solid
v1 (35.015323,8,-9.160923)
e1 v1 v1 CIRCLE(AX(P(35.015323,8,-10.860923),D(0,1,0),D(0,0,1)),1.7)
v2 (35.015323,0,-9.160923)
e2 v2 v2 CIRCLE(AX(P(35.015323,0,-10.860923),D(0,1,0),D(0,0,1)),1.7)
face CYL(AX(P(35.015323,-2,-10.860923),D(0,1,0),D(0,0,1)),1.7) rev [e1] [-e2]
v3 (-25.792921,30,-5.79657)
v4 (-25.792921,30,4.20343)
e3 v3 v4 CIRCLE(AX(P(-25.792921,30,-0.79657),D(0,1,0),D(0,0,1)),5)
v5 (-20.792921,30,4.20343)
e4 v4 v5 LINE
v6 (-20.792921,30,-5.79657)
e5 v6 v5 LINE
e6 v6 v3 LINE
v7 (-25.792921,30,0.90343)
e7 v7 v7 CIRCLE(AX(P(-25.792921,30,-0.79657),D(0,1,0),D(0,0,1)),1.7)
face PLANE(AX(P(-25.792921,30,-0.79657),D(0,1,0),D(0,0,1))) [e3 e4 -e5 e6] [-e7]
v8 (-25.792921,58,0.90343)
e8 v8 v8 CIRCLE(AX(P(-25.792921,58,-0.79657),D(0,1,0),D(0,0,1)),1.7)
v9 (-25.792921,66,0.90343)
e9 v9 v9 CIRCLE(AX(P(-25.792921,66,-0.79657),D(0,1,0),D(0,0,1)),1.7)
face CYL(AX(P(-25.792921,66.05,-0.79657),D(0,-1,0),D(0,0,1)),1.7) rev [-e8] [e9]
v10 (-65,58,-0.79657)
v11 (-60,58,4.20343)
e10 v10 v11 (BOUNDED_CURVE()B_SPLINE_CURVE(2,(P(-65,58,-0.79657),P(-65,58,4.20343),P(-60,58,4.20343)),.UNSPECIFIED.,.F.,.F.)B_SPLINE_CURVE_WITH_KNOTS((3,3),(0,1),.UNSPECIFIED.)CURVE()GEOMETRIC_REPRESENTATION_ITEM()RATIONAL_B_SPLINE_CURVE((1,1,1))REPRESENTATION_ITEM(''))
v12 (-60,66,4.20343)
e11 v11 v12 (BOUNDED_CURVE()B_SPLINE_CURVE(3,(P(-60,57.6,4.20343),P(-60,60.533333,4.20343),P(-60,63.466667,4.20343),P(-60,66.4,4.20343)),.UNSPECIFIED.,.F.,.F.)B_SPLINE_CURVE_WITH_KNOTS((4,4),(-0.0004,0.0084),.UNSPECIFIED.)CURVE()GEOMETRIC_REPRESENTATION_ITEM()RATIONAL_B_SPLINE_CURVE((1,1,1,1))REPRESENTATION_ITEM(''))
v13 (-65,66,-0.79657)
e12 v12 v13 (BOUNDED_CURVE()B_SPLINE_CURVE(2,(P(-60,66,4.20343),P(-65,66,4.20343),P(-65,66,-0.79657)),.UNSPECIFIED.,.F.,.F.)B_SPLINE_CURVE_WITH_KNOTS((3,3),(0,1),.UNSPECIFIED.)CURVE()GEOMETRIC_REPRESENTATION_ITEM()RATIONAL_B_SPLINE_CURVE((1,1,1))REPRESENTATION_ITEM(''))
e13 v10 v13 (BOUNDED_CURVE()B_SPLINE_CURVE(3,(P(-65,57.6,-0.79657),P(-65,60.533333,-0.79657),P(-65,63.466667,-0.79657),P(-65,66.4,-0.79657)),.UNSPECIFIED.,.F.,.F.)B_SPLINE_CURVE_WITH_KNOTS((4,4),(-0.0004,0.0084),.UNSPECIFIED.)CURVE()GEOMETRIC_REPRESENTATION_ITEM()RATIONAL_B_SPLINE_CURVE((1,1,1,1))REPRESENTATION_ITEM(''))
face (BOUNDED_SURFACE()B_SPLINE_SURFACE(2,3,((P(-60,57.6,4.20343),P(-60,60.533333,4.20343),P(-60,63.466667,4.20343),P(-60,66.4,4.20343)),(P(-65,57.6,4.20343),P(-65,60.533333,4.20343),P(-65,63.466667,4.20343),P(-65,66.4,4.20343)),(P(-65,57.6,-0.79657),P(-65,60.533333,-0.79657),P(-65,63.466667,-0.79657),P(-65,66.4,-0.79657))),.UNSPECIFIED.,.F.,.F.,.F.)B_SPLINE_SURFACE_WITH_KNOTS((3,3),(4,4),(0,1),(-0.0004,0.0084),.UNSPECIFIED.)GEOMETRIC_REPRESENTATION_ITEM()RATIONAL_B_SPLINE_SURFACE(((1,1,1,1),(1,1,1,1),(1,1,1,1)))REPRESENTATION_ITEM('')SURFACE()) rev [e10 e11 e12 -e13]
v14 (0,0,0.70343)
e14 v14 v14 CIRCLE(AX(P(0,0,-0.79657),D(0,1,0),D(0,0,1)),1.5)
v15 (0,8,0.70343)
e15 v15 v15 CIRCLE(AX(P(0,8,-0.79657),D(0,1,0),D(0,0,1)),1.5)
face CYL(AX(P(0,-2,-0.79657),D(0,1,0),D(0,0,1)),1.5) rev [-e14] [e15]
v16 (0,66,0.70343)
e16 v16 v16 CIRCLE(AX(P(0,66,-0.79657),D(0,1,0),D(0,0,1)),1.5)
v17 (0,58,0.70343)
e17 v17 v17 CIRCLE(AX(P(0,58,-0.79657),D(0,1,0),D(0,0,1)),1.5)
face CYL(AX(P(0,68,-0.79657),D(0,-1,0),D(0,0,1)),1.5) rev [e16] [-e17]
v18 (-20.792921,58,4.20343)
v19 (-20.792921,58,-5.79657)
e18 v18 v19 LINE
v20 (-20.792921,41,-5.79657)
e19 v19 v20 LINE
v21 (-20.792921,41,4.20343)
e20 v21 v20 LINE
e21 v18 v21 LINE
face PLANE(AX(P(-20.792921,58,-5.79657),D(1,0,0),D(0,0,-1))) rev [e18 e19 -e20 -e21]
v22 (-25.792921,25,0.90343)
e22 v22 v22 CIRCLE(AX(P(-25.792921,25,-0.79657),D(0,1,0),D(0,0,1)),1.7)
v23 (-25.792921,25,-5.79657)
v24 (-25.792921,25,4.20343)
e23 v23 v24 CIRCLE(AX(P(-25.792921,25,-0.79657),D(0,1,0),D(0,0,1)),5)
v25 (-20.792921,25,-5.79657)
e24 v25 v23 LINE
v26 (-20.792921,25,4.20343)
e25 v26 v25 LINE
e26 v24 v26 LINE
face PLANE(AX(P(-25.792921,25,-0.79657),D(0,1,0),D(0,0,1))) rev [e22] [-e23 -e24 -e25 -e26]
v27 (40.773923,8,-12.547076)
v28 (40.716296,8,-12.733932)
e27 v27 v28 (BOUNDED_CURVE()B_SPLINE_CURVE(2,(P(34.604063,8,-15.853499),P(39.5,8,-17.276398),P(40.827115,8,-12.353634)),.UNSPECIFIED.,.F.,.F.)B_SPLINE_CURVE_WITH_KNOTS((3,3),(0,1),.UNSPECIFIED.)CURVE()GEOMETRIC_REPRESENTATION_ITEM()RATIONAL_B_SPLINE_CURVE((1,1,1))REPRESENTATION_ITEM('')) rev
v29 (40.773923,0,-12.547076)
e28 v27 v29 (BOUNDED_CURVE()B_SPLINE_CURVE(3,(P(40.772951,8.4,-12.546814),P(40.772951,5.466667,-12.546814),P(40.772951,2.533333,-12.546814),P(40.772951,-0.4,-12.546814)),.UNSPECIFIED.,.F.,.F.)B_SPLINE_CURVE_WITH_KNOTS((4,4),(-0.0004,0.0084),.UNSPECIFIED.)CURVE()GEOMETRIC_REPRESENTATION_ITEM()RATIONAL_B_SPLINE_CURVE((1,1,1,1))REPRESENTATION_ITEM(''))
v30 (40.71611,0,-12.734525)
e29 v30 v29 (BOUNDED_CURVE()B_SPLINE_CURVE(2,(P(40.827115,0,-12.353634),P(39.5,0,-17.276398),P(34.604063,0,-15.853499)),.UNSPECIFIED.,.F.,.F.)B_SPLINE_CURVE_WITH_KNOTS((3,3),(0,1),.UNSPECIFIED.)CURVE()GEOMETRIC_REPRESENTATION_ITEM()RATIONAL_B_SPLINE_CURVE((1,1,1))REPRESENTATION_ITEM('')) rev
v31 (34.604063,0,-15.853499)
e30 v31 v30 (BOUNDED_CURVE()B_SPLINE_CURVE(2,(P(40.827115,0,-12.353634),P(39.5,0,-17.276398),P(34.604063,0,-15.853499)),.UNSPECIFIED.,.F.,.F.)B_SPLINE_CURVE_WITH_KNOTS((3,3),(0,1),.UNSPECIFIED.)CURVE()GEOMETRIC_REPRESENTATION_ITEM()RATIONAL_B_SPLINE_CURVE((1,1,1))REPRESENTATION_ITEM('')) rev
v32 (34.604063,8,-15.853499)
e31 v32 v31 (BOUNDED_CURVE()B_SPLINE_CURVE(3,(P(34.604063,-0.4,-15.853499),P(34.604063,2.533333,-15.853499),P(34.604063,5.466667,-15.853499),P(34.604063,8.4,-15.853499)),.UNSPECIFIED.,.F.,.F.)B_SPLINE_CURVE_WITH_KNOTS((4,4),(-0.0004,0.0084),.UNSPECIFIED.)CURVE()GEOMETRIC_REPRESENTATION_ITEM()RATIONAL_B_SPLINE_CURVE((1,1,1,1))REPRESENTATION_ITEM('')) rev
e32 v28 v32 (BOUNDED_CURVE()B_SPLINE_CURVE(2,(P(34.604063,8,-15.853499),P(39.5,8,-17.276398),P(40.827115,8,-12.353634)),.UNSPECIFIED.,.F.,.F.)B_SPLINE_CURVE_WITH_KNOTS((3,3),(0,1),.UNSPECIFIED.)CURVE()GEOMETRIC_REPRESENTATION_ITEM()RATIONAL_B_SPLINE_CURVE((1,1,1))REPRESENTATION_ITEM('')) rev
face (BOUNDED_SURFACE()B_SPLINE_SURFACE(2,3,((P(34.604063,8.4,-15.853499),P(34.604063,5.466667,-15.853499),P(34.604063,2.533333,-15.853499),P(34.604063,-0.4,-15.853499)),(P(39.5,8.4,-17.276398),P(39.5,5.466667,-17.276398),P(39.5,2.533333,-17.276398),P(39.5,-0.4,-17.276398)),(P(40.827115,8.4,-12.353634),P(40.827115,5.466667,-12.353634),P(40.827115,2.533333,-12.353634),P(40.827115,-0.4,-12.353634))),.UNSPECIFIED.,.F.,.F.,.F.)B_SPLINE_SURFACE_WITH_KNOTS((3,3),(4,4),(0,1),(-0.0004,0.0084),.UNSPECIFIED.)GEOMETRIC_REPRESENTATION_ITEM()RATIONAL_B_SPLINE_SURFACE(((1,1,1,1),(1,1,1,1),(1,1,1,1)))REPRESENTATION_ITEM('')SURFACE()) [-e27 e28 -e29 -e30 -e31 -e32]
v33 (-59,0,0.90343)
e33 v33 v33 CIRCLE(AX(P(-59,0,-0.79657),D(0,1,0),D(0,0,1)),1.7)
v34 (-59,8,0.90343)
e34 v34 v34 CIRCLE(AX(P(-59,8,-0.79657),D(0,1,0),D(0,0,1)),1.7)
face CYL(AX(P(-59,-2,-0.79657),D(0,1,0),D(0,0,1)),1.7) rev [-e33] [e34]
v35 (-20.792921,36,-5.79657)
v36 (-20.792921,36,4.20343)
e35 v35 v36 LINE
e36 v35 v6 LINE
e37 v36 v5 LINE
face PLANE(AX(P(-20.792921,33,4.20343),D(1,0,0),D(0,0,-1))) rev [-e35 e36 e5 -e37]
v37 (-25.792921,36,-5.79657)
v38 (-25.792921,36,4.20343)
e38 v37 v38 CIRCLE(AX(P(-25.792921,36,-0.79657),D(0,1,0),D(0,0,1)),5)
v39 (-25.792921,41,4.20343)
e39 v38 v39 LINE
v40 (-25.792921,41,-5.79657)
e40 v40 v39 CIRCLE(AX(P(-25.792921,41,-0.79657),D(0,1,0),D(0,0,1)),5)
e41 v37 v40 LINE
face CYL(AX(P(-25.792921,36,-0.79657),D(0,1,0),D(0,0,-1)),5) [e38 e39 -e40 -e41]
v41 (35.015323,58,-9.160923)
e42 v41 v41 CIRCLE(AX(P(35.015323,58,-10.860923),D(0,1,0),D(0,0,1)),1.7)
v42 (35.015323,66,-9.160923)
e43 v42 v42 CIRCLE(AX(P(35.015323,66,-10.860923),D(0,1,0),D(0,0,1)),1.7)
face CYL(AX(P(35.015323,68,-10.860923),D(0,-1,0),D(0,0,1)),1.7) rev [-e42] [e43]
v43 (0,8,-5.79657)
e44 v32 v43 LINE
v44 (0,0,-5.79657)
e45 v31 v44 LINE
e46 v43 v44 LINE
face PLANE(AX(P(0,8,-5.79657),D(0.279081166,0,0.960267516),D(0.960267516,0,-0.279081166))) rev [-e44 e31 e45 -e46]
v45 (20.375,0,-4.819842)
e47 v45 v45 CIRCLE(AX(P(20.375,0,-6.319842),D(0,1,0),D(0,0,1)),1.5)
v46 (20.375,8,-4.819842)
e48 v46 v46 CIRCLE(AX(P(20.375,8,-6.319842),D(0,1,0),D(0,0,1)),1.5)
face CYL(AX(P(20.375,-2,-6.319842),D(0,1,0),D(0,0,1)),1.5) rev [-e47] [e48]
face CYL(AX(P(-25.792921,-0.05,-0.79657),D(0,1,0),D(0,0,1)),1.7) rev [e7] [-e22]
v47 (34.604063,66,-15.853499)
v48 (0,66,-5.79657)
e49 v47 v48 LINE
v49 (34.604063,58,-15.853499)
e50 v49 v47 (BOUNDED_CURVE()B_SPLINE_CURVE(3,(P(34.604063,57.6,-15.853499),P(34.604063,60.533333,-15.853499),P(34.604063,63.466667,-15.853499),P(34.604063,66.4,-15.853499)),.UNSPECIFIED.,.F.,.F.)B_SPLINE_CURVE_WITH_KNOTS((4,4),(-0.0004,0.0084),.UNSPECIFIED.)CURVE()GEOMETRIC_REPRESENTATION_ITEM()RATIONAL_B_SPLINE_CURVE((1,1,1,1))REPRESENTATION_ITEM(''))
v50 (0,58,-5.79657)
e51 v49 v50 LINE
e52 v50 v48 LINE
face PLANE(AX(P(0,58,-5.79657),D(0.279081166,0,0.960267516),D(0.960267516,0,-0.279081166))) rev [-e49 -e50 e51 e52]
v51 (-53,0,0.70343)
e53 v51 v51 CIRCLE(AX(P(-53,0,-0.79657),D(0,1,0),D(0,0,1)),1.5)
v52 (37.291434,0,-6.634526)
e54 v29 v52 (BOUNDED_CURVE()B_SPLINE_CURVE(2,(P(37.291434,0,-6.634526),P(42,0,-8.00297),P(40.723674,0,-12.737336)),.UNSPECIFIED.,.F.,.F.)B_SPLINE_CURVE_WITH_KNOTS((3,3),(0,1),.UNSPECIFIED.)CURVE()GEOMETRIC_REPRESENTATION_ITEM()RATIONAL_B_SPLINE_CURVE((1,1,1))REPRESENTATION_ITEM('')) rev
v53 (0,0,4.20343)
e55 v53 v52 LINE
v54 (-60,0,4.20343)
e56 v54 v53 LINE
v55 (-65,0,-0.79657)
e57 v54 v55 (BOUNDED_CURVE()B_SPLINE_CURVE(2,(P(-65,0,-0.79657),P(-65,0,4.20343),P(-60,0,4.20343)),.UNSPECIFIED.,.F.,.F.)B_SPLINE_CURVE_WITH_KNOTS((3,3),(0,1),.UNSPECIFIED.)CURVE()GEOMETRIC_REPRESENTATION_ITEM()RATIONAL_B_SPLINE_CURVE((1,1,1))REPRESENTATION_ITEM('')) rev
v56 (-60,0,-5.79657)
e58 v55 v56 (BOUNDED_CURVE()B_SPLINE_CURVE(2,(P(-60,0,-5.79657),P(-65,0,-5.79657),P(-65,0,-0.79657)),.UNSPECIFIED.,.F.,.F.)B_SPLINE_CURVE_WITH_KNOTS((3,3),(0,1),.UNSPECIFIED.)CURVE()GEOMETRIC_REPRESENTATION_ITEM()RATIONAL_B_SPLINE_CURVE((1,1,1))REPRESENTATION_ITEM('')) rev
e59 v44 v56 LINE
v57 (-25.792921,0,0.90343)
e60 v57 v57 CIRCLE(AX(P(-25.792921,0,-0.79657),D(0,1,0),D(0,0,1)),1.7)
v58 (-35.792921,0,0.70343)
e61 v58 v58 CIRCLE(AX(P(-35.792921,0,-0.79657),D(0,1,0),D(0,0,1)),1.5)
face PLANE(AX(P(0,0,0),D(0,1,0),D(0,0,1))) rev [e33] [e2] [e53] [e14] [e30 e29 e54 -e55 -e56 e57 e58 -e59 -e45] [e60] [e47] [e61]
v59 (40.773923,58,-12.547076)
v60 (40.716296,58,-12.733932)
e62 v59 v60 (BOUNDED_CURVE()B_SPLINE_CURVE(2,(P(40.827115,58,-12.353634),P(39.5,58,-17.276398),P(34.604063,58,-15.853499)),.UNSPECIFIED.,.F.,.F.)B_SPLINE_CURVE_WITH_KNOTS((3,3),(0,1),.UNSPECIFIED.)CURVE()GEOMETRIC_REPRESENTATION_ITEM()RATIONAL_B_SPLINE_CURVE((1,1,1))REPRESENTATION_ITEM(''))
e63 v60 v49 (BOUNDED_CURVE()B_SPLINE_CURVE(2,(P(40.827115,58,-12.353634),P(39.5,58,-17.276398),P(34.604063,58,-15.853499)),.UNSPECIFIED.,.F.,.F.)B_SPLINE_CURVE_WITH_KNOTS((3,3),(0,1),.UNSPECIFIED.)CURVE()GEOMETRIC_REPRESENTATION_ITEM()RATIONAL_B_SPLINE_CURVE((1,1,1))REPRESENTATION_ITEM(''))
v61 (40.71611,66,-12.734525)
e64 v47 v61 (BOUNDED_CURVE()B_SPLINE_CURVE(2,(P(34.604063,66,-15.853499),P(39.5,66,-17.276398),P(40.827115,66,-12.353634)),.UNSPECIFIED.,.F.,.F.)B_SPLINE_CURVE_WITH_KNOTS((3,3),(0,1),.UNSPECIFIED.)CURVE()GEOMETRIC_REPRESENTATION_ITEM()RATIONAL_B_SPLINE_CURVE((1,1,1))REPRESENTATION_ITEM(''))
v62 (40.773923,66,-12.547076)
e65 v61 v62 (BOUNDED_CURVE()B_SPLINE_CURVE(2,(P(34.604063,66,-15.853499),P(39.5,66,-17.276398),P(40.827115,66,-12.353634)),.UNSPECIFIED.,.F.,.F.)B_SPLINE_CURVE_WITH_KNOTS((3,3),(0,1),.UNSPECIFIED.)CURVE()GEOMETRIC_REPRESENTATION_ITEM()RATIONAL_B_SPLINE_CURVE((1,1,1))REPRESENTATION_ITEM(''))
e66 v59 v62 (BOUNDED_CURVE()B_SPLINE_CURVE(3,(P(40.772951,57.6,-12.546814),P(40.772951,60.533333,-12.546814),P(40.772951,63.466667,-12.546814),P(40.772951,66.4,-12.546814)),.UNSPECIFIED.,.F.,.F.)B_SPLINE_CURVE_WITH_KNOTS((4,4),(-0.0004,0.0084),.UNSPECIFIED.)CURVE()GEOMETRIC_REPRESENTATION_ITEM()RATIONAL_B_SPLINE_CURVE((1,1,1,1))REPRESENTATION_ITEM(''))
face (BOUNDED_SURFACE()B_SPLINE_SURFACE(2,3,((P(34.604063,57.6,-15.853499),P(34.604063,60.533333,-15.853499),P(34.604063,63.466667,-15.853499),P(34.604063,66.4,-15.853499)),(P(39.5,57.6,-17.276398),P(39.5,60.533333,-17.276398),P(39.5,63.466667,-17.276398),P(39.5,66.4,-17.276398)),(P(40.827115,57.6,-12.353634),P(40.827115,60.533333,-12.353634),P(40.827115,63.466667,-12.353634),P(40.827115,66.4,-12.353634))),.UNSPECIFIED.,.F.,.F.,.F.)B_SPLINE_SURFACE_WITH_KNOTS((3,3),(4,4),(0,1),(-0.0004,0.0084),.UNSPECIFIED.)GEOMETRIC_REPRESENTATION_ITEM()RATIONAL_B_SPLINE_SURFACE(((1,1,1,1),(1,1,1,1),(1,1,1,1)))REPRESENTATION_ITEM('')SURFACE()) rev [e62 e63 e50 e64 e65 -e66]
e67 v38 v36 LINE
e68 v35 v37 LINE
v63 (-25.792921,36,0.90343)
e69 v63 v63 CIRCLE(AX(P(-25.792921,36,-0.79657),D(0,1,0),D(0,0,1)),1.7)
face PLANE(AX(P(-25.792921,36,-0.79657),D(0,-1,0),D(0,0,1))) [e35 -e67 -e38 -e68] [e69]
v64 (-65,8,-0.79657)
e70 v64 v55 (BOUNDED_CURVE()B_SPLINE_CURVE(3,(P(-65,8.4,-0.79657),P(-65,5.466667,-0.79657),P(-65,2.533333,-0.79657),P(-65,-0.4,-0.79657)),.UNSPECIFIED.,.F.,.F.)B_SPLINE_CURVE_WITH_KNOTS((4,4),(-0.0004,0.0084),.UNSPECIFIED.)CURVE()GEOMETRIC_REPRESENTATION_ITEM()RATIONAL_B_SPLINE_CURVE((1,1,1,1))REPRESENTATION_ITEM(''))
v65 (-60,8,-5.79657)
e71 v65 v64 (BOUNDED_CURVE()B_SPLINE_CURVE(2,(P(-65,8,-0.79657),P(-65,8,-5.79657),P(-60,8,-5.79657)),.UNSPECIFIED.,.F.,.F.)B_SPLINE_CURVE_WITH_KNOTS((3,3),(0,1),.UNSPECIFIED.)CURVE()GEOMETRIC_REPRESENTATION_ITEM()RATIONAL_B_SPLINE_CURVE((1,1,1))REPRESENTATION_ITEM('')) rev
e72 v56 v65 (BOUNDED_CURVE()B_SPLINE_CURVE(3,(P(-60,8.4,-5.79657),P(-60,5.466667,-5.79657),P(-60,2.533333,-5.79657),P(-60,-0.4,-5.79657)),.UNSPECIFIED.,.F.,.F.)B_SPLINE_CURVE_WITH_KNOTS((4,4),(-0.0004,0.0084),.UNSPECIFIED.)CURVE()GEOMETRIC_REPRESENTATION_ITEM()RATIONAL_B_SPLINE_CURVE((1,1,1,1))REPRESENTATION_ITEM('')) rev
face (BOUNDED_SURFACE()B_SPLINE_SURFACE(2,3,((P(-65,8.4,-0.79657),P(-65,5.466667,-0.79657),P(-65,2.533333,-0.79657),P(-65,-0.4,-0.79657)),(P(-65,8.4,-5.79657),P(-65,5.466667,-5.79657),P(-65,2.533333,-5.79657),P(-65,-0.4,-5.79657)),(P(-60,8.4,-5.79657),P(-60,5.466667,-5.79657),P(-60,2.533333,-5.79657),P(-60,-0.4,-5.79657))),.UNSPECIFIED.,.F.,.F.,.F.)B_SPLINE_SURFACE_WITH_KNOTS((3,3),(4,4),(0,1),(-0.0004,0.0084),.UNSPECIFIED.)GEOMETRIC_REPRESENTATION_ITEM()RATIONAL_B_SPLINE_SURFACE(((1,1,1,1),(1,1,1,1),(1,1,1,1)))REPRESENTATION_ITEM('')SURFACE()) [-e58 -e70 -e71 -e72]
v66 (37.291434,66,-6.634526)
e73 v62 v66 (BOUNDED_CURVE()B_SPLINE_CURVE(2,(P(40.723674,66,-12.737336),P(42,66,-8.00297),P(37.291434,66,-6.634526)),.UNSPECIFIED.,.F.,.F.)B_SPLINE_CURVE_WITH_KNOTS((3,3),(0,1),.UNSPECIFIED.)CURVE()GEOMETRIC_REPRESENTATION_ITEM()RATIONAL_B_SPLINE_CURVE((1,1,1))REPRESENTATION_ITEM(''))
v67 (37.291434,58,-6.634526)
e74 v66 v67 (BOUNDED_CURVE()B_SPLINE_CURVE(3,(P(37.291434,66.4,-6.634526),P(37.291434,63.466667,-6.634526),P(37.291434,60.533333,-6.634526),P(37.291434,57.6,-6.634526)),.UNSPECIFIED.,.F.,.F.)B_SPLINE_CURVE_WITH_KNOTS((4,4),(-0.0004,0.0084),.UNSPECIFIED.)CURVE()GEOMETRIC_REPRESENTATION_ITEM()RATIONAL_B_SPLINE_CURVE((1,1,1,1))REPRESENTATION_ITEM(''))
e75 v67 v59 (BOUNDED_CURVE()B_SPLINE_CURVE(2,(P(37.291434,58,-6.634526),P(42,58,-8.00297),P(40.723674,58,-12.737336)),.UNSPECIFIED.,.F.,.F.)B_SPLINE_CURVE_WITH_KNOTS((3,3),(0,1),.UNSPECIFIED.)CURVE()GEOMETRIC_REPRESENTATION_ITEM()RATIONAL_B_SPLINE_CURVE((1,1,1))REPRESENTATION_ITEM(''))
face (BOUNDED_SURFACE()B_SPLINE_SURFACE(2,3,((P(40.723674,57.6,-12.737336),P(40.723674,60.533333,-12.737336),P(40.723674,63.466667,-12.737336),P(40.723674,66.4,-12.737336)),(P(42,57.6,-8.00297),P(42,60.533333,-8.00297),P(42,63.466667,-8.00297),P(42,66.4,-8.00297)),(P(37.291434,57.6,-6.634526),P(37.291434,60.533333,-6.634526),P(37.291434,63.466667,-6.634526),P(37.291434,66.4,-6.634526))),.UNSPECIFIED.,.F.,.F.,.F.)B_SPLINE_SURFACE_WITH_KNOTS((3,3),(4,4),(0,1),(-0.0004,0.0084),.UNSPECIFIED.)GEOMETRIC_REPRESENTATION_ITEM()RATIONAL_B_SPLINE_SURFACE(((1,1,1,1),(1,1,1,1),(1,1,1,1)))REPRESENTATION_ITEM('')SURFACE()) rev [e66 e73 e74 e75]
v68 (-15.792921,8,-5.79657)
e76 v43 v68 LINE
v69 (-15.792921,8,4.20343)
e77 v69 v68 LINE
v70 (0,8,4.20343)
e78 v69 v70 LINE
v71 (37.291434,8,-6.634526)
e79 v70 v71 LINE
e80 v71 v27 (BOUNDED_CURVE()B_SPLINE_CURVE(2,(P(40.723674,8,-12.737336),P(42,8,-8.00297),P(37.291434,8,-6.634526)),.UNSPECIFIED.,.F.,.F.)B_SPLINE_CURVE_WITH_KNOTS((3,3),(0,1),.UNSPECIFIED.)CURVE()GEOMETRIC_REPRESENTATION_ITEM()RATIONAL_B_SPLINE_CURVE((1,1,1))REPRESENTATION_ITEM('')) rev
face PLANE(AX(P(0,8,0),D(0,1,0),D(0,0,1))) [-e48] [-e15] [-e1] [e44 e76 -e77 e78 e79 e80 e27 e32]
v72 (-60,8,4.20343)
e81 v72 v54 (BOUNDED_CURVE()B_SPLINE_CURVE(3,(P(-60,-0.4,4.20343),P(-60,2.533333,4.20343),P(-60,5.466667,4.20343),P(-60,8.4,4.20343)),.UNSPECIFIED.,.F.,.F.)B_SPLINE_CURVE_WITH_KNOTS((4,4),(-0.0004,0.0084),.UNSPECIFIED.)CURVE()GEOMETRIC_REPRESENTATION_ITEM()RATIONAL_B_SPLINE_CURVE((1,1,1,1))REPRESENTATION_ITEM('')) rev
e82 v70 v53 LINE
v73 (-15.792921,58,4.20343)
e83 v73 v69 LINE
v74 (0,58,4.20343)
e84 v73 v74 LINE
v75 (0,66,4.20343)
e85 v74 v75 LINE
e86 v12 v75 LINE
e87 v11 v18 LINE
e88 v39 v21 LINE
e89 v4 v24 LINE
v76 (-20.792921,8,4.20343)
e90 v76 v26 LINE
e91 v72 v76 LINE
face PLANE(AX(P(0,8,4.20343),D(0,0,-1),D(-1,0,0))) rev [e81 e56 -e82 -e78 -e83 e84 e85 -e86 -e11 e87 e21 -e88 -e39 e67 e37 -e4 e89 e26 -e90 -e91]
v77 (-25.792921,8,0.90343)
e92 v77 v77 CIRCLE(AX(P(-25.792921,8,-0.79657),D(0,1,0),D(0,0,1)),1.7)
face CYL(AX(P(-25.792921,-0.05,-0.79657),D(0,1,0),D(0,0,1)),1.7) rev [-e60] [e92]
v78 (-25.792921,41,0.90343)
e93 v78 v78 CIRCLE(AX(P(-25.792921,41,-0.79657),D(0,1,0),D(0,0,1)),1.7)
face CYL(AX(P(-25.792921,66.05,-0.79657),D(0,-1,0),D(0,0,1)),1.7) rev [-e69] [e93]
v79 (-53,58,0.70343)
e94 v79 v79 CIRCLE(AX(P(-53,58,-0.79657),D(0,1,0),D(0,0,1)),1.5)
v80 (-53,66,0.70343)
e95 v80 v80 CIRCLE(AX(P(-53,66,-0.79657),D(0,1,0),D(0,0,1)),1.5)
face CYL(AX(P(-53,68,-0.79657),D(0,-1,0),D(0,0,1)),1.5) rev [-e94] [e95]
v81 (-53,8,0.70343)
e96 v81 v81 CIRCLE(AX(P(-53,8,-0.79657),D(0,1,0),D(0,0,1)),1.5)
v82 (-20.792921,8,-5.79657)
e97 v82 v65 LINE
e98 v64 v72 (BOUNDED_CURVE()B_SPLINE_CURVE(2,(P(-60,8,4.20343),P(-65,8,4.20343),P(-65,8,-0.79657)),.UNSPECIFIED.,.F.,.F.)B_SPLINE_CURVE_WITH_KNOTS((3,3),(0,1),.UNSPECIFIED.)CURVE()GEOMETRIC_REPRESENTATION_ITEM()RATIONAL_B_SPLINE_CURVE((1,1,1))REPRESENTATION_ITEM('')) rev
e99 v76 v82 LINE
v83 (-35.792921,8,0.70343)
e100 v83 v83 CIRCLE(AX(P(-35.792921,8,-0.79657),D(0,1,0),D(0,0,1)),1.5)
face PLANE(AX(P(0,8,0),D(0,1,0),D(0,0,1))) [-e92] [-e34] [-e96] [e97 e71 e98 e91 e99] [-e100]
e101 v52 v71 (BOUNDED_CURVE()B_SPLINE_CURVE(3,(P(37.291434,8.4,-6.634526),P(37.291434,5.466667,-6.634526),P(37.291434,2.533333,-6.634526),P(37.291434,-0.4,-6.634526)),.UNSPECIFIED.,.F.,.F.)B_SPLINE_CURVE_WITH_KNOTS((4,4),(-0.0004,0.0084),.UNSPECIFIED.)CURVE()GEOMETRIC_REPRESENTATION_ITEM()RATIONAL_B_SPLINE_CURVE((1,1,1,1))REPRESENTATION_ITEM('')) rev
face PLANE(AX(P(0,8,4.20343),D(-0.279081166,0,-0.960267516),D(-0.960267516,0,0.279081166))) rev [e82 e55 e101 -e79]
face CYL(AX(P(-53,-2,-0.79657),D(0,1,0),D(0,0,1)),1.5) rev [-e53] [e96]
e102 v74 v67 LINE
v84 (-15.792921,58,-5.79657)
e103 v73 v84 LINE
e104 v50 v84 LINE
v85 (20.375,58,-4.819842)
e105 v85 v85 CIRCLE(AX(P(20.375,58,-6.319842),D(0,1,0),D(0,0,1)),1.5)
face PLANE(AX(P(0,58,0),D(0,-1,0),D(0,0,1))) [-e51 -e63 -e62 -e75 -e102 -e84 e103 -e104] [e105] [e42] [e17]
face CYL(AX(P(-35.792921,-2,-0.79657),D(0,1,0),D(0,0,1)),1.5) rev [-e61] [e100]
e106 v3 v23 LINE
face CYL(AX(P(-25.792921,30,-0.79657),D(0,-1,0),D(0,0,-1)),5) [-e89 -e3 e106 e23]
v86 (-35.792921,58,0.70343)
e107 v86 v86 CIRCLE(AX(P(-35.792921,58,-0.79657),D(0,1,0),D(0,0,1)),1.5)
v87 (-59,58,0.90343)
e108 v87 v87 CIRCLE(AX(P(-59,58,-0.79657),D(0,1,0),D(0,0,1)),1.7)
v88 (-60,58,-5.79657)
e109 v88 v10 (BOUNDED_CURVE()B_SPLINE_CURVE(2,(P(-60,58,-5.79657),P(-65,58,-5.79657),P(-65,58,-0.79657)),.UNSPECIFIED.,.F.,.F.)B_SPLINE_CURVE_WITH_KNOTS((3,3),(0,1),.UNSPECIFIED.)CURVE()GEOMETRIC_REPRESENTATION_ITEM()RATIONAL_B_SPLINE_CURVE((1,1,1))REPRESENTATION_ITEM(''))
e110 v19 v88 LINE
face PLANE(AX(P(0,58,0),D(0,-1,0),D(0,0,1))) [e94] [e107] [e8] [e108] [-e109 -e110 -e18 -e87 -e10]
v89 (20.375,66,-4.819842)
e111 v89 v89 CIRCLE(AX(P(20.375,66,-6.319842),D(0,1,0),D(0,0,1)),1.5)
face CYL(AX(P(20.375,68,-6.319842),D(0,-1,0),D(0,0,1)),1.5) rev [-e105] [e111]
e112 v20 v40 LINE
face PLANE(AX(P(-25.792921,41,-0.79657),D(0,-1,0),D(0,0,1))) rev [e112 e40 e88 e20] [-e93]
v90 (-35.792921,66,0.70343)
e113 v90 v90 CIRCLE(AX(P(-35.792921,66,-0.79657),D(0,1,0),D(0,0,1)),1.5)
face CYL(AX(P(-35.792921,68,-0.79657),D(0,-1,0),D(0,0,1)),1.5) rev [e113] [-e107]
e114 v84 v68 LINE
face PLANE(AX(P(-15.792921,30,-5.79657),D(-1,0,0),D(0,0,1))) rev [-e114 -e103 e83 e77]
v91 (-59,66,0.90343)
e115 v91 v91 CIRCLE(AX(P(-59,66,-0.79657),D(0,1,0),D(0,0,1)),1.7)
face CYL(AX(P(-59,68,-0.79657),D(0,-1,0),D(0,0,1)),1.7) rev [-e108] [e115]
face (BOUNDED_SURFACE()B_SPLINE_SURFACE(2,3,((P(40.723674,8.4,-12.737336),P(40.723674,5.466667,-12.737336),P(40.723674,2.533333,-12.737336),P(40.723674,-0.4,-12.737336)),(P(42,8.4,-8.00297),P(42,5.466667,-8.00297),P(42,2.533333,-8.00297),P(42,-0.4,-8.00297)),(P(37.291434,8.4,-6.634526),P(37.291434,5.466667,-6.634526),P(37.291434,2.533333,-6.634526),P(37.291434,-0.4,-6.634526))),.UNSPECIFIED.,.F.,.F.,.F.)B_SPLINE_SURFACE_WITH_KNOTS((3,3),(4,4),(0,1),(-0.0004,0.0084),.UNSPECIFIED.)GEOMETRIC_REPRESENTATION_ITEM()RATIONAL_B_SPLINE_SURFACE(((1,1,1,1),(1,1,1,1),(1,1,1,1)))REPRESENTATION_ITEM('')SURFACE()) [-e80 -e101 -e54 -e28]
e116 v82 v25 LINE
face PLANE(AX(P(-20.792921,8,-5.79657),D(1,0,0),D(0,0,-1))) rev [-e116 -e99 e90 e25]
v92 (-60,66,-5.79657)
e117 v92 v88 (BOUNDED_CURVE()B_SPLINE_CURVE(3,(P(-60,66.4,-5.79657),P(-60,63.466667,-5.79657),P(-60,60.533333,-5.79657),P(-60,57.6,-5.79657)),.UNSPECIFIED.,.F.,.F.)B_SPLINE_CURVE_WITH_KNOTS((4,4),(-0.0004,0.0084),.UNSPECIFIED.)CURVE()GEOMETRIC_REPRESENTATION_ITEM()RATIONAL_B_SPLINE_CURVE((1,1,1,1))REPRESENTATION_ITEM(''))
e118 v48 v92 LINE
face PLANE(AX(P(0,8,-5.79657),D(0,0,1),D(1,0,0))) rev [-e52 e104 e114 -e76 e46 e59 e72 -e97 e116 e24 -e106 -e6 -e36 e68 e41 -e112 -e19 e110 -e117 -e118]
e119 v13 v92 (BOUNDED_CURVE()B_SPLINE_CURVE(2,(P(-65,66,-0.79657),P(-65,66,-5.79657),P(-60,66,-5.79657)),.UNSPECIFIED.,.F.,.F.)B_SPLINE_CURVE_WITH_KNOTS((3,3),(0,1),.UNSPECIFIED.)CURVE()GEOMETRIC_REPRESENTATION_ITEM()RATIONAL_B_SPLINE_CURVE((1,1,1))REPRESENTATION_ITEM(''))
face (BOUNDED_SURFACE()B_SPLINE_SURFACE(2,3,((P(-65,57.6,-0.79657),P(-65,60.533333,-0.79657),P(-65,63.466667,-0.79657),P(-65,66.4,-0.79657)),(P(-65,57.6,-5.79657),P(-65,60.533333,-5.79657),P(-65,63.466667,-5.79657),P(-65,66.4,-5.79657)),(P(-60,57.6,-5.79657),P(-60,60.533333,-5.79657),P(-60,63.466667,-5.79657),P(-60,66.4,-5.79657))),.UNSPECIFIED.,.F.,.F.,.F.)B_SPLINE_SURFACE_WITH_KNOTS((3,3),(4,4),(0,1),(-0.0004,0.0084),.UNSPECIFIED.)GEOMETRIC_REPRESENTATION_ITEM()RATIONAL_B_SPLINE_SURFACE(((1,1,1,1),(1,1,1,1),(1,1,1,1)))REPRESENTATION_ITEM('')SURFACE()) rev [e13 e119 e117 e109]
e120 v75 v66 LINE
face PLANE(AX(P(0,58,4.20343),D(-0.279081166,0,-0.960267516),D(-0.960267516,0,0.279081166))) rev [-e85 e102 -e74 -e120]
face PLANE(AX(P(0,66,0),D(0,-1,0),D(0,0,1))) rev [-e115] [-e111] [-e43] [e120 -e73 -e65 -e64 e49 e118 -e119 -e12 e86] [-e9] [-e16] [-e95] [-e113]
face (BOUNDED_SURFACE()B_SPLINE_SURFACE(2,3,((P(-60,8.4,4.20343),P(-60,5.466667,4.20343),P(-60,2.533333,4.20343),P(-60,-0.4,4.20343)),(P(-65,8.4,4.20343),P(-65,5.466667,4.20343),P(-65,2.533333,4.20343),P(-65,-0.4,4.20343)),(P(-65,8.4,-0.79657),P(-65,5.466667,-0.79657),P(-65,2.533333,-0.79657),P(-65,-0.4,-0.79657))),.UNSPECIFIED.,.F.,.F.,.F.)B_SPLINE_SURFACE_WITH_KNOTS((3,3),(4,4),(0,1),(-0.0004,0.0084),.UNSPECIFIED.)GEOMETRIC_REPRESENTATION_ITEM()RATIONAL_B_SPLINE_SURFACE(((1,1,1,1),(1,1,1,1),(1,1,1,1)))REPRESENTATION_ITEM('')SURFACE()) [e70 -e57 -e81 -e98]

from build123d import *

# Parameters (mm, degrees)
BOSS_EXTRUDE1_DEPTH = 8
SKETCH2_R           = 1.7
SKETCH2_R_2         = 1.5
CUT_EXTRUDE1_DEPTH  = 10
FILLET1_SIZE        = 5
SKETCH3_R           = 5
BOSS_EXTRUDE2_DEPTH = 22
SKETCH4_R           = 1.7
CUT_EXTRUDE2_DEPTH  = 74.393131138
BOSS_EXTRUDE4_DEPTH = 22
SKETCH9_R           = 1.7
CUT_EXTRUDE3_DEPTH  = 17
SKETCH10_W          = 5
SKETCH10_H          = 10
BOSS_EXTRUDE5_DEPTH = 3


with BuildPart() as part:
    # Sketch1 → Boss-Extrude1 (new body)
    with BuildSketch(Plane(origin=(0, 0, 0), x_dir=(1, 0, 0), z_dir=(0, 1, 0))):
        Polygon((0, 5.796570021), (-65, 5.796570021), (-65, -4.203429979), (0, -4.203429979), (42, 8.002969552), (39.5, 17.276398151), align=None)
    extrude(amount=BOSS_EXTRUDE1_DEPTH)

    # Sketch2 → Cut-Extrude1 (cut)
    with BuildSketch(Plane(origin=(0, 8, 0), x_dir=(1, 0, 0), z_dir=(0, 1, 0))):
        with Locations(Location((-59, 0.796570021, 0), (0, 0, 270))):
            Circle(SKETCH2_R)
        with Locations(Location((-53, 0.796570021, 0), (0, 0, 270))):
            Circle(SKETCH2_R_2)
        with Locations(Location((-35.792921067, 0.796570021, 0), (0, 0, 270))):
            Circle(SKETCH2_R_2)
        with Locations(Location((20.375, 6.319841926, 0), (0, 0, 270))):
            Circle(SKETCH2_R_2)
        with Locations(Location((35.015323176, 10.860923065, 0), (0, 0, 270))):
            Circle(SKETCH2_R)
        with Locations(Location((0, 0.796570021, 0), (0, 0, 270))):
            Circle(SKETCH2_R_2)
    extrude(amount=-CUT_EXTRUDE1_DEPTH, mode=Mode.SUBTRACT)

    # Fillet1
    # a fillet whose section is not a circle: 5 mm, written as the material it takes off along each edge
    with BuildSketch(Plane(origin=(-65, -12.5, 4.203429979), x_dir=(0, 0, -1), z_dir=(0, 1, 0)), Plane(origin=(-65, -12.5, -5.796570021), x_dir=(1, 0, 0), z_dir=(0, 1, 0))) as fillet1_piece_1:
        with BuildLine():
            Bezier((FILLET1_SIZE, 0), (0, 0), (0, -FILLET1_SIZE), weights=[1, 1, 1])
            Line((0, -FILLET1_SIZE), (0, 0))
            Line((0, 0), (FILLET1_SIZE, 0))
        make_face()
    extrude(amount=33, mode=Mode.SUBTRACT)

    # Fillet2
    # a fillet whose section is not a circle: 5 mm, written as the material it takes off along each edge
    with BuildSketch(Plane(origin=(39.5, -12.746283343, -17.276398151), x_dir=(-0.9602675163397548, 0, 0.27908116572545455), z_dir=(0, 1, 0))) as fillet2_piece_1:
        with BuildLine():
            Bezier((5.098513337, 0), (0, 0), (0.099464892, 5.097543034), weights=[1, 1, 1])
            Line((0.099464892, 5.097543034), (0, 0))
            Line((0, 0), (5.098513337, 0))
        make_face()
    extrude(amount=33.492566686, mode=Mode.SUBTRACT)
    with BuildSketch(Plane(origin=(42, -12.258475337, -8.002969552), x_dir=(-0.2602945720874772, 0, -0.9655292516241013), z_dir=(0, 1, 0))) as fillet2_piece_2:
        with BuildLine():
            Bezier((4.903390135, 0), (0, 0), (-0.09565831, 4.902456966), weights=[1, 1, 1])
            Line((-0.09565831, 4.902456966), (0, 0))
            Line((0, 0), (4.903390135, 0))
        make_face()
    extrude(amount=32.516950674, mode=Mode.SUBTRACT)

    # Sketch3 → Boss-Extrude2 (add)
    with BuildSketch(Plane(origin=(0, 8, 0), x_dir=(1, 0, 0), z_dir=(0, 1, 0))):
        with Locations(Location((-25.792921067, 0.796570021, 0), (0, 0, 270))):
            Circle(SKETCH3_R)
    extrude(amount=BOSS_EXTRUDE2_DEPTH)

    # Sketch4 → Cut-Extrude2 (cut, through all)
    with BuildSketch(Plane(origin=(0, 30, 0), x_dir=(1, 0, 0), z_dir=(0, 1, 0))):
        with Locations(Location((-25.792921067, 0.796570021, 0), (0, 0, 270))):
            Circle(SKETCH4_R)
    extrude(amount=-CUT_EXTRUDE2_DEPTH, mode=Mode.SUBTRACT)

    # Sketch6 → Boss-Extrude4 (add)
    with BuildSketch(Plane(origin=(0, 8, 0), x_dir=(1, 0, 0), z_dir=(0, 1, 0))):
        with BuildLine():
            Line((-15.792921067, 5.796570021), (-25.792921067, 5.796570021))
            ThreePointArc((-25.792921067, 5.796570021), (-20.792921067, 0.796570021), (-25.792921067, -4.203429979))
            Line((-25.792921067, -4.203429979), (-15.792921067, -4.203429979))
            Line((-15.792921067, -4.203429979), (-15.792921067, 5.796570021))
        make_face()
    extrude(amount=BOSS_EXTRUDE4_DEPTH)

    # Sketch9 → Cut-Extrude3 (cut)
    with BuildSketch(Plane(origin=(0, 25, 0), x_dir=(1, 0, 0), z_dir=(0, 1, 0))):
        with BuildLine():
            Line((-25.792921067, 5.796570021), (-20.792921067, 5.796570021))
            Line((-20.792921067, 5.796570021), (-20.792921067, -4.203429979))
            Line((-20.792921067, -4.203429979), (-25.792921067, -4.203429979))
            ThreePointArc((-25.792921067, -4.203429979), (-30.792921067, 0.796570021), (-25.792921067, 5.796570021))
        make_face()
        with Locations(Location((-25.792921067, 0.796570021, 0), (0, 0, 270))):
            Circle(SKETCH9_R, mode=Mode.SUBTRACT)
    extrude(amount=-CUT_EXTRUDE3_DEPTH, mode=Mode.SUBTRACT)

    # Sketch10 → Boss-Extrude5 (add)
    with BuildSketch(Plane(origin=(0, 30, 0), x_dir=(1, 0, 0), z_dir=(0, 1, 0))):
        with Locations((-18.292921067, 0.796570021)):
            Rectangle(SKETCH10_W, SKETCH10_H)
    extrude(amount=BOSS_EXTRUDE5_DEPTH)

    # Mirror1: part across plane


with BuildPart() as part_1:
    add(part.part)
    add(part.part.mirror(Plane.ZX.offset(33)))


solid = part_1.part
